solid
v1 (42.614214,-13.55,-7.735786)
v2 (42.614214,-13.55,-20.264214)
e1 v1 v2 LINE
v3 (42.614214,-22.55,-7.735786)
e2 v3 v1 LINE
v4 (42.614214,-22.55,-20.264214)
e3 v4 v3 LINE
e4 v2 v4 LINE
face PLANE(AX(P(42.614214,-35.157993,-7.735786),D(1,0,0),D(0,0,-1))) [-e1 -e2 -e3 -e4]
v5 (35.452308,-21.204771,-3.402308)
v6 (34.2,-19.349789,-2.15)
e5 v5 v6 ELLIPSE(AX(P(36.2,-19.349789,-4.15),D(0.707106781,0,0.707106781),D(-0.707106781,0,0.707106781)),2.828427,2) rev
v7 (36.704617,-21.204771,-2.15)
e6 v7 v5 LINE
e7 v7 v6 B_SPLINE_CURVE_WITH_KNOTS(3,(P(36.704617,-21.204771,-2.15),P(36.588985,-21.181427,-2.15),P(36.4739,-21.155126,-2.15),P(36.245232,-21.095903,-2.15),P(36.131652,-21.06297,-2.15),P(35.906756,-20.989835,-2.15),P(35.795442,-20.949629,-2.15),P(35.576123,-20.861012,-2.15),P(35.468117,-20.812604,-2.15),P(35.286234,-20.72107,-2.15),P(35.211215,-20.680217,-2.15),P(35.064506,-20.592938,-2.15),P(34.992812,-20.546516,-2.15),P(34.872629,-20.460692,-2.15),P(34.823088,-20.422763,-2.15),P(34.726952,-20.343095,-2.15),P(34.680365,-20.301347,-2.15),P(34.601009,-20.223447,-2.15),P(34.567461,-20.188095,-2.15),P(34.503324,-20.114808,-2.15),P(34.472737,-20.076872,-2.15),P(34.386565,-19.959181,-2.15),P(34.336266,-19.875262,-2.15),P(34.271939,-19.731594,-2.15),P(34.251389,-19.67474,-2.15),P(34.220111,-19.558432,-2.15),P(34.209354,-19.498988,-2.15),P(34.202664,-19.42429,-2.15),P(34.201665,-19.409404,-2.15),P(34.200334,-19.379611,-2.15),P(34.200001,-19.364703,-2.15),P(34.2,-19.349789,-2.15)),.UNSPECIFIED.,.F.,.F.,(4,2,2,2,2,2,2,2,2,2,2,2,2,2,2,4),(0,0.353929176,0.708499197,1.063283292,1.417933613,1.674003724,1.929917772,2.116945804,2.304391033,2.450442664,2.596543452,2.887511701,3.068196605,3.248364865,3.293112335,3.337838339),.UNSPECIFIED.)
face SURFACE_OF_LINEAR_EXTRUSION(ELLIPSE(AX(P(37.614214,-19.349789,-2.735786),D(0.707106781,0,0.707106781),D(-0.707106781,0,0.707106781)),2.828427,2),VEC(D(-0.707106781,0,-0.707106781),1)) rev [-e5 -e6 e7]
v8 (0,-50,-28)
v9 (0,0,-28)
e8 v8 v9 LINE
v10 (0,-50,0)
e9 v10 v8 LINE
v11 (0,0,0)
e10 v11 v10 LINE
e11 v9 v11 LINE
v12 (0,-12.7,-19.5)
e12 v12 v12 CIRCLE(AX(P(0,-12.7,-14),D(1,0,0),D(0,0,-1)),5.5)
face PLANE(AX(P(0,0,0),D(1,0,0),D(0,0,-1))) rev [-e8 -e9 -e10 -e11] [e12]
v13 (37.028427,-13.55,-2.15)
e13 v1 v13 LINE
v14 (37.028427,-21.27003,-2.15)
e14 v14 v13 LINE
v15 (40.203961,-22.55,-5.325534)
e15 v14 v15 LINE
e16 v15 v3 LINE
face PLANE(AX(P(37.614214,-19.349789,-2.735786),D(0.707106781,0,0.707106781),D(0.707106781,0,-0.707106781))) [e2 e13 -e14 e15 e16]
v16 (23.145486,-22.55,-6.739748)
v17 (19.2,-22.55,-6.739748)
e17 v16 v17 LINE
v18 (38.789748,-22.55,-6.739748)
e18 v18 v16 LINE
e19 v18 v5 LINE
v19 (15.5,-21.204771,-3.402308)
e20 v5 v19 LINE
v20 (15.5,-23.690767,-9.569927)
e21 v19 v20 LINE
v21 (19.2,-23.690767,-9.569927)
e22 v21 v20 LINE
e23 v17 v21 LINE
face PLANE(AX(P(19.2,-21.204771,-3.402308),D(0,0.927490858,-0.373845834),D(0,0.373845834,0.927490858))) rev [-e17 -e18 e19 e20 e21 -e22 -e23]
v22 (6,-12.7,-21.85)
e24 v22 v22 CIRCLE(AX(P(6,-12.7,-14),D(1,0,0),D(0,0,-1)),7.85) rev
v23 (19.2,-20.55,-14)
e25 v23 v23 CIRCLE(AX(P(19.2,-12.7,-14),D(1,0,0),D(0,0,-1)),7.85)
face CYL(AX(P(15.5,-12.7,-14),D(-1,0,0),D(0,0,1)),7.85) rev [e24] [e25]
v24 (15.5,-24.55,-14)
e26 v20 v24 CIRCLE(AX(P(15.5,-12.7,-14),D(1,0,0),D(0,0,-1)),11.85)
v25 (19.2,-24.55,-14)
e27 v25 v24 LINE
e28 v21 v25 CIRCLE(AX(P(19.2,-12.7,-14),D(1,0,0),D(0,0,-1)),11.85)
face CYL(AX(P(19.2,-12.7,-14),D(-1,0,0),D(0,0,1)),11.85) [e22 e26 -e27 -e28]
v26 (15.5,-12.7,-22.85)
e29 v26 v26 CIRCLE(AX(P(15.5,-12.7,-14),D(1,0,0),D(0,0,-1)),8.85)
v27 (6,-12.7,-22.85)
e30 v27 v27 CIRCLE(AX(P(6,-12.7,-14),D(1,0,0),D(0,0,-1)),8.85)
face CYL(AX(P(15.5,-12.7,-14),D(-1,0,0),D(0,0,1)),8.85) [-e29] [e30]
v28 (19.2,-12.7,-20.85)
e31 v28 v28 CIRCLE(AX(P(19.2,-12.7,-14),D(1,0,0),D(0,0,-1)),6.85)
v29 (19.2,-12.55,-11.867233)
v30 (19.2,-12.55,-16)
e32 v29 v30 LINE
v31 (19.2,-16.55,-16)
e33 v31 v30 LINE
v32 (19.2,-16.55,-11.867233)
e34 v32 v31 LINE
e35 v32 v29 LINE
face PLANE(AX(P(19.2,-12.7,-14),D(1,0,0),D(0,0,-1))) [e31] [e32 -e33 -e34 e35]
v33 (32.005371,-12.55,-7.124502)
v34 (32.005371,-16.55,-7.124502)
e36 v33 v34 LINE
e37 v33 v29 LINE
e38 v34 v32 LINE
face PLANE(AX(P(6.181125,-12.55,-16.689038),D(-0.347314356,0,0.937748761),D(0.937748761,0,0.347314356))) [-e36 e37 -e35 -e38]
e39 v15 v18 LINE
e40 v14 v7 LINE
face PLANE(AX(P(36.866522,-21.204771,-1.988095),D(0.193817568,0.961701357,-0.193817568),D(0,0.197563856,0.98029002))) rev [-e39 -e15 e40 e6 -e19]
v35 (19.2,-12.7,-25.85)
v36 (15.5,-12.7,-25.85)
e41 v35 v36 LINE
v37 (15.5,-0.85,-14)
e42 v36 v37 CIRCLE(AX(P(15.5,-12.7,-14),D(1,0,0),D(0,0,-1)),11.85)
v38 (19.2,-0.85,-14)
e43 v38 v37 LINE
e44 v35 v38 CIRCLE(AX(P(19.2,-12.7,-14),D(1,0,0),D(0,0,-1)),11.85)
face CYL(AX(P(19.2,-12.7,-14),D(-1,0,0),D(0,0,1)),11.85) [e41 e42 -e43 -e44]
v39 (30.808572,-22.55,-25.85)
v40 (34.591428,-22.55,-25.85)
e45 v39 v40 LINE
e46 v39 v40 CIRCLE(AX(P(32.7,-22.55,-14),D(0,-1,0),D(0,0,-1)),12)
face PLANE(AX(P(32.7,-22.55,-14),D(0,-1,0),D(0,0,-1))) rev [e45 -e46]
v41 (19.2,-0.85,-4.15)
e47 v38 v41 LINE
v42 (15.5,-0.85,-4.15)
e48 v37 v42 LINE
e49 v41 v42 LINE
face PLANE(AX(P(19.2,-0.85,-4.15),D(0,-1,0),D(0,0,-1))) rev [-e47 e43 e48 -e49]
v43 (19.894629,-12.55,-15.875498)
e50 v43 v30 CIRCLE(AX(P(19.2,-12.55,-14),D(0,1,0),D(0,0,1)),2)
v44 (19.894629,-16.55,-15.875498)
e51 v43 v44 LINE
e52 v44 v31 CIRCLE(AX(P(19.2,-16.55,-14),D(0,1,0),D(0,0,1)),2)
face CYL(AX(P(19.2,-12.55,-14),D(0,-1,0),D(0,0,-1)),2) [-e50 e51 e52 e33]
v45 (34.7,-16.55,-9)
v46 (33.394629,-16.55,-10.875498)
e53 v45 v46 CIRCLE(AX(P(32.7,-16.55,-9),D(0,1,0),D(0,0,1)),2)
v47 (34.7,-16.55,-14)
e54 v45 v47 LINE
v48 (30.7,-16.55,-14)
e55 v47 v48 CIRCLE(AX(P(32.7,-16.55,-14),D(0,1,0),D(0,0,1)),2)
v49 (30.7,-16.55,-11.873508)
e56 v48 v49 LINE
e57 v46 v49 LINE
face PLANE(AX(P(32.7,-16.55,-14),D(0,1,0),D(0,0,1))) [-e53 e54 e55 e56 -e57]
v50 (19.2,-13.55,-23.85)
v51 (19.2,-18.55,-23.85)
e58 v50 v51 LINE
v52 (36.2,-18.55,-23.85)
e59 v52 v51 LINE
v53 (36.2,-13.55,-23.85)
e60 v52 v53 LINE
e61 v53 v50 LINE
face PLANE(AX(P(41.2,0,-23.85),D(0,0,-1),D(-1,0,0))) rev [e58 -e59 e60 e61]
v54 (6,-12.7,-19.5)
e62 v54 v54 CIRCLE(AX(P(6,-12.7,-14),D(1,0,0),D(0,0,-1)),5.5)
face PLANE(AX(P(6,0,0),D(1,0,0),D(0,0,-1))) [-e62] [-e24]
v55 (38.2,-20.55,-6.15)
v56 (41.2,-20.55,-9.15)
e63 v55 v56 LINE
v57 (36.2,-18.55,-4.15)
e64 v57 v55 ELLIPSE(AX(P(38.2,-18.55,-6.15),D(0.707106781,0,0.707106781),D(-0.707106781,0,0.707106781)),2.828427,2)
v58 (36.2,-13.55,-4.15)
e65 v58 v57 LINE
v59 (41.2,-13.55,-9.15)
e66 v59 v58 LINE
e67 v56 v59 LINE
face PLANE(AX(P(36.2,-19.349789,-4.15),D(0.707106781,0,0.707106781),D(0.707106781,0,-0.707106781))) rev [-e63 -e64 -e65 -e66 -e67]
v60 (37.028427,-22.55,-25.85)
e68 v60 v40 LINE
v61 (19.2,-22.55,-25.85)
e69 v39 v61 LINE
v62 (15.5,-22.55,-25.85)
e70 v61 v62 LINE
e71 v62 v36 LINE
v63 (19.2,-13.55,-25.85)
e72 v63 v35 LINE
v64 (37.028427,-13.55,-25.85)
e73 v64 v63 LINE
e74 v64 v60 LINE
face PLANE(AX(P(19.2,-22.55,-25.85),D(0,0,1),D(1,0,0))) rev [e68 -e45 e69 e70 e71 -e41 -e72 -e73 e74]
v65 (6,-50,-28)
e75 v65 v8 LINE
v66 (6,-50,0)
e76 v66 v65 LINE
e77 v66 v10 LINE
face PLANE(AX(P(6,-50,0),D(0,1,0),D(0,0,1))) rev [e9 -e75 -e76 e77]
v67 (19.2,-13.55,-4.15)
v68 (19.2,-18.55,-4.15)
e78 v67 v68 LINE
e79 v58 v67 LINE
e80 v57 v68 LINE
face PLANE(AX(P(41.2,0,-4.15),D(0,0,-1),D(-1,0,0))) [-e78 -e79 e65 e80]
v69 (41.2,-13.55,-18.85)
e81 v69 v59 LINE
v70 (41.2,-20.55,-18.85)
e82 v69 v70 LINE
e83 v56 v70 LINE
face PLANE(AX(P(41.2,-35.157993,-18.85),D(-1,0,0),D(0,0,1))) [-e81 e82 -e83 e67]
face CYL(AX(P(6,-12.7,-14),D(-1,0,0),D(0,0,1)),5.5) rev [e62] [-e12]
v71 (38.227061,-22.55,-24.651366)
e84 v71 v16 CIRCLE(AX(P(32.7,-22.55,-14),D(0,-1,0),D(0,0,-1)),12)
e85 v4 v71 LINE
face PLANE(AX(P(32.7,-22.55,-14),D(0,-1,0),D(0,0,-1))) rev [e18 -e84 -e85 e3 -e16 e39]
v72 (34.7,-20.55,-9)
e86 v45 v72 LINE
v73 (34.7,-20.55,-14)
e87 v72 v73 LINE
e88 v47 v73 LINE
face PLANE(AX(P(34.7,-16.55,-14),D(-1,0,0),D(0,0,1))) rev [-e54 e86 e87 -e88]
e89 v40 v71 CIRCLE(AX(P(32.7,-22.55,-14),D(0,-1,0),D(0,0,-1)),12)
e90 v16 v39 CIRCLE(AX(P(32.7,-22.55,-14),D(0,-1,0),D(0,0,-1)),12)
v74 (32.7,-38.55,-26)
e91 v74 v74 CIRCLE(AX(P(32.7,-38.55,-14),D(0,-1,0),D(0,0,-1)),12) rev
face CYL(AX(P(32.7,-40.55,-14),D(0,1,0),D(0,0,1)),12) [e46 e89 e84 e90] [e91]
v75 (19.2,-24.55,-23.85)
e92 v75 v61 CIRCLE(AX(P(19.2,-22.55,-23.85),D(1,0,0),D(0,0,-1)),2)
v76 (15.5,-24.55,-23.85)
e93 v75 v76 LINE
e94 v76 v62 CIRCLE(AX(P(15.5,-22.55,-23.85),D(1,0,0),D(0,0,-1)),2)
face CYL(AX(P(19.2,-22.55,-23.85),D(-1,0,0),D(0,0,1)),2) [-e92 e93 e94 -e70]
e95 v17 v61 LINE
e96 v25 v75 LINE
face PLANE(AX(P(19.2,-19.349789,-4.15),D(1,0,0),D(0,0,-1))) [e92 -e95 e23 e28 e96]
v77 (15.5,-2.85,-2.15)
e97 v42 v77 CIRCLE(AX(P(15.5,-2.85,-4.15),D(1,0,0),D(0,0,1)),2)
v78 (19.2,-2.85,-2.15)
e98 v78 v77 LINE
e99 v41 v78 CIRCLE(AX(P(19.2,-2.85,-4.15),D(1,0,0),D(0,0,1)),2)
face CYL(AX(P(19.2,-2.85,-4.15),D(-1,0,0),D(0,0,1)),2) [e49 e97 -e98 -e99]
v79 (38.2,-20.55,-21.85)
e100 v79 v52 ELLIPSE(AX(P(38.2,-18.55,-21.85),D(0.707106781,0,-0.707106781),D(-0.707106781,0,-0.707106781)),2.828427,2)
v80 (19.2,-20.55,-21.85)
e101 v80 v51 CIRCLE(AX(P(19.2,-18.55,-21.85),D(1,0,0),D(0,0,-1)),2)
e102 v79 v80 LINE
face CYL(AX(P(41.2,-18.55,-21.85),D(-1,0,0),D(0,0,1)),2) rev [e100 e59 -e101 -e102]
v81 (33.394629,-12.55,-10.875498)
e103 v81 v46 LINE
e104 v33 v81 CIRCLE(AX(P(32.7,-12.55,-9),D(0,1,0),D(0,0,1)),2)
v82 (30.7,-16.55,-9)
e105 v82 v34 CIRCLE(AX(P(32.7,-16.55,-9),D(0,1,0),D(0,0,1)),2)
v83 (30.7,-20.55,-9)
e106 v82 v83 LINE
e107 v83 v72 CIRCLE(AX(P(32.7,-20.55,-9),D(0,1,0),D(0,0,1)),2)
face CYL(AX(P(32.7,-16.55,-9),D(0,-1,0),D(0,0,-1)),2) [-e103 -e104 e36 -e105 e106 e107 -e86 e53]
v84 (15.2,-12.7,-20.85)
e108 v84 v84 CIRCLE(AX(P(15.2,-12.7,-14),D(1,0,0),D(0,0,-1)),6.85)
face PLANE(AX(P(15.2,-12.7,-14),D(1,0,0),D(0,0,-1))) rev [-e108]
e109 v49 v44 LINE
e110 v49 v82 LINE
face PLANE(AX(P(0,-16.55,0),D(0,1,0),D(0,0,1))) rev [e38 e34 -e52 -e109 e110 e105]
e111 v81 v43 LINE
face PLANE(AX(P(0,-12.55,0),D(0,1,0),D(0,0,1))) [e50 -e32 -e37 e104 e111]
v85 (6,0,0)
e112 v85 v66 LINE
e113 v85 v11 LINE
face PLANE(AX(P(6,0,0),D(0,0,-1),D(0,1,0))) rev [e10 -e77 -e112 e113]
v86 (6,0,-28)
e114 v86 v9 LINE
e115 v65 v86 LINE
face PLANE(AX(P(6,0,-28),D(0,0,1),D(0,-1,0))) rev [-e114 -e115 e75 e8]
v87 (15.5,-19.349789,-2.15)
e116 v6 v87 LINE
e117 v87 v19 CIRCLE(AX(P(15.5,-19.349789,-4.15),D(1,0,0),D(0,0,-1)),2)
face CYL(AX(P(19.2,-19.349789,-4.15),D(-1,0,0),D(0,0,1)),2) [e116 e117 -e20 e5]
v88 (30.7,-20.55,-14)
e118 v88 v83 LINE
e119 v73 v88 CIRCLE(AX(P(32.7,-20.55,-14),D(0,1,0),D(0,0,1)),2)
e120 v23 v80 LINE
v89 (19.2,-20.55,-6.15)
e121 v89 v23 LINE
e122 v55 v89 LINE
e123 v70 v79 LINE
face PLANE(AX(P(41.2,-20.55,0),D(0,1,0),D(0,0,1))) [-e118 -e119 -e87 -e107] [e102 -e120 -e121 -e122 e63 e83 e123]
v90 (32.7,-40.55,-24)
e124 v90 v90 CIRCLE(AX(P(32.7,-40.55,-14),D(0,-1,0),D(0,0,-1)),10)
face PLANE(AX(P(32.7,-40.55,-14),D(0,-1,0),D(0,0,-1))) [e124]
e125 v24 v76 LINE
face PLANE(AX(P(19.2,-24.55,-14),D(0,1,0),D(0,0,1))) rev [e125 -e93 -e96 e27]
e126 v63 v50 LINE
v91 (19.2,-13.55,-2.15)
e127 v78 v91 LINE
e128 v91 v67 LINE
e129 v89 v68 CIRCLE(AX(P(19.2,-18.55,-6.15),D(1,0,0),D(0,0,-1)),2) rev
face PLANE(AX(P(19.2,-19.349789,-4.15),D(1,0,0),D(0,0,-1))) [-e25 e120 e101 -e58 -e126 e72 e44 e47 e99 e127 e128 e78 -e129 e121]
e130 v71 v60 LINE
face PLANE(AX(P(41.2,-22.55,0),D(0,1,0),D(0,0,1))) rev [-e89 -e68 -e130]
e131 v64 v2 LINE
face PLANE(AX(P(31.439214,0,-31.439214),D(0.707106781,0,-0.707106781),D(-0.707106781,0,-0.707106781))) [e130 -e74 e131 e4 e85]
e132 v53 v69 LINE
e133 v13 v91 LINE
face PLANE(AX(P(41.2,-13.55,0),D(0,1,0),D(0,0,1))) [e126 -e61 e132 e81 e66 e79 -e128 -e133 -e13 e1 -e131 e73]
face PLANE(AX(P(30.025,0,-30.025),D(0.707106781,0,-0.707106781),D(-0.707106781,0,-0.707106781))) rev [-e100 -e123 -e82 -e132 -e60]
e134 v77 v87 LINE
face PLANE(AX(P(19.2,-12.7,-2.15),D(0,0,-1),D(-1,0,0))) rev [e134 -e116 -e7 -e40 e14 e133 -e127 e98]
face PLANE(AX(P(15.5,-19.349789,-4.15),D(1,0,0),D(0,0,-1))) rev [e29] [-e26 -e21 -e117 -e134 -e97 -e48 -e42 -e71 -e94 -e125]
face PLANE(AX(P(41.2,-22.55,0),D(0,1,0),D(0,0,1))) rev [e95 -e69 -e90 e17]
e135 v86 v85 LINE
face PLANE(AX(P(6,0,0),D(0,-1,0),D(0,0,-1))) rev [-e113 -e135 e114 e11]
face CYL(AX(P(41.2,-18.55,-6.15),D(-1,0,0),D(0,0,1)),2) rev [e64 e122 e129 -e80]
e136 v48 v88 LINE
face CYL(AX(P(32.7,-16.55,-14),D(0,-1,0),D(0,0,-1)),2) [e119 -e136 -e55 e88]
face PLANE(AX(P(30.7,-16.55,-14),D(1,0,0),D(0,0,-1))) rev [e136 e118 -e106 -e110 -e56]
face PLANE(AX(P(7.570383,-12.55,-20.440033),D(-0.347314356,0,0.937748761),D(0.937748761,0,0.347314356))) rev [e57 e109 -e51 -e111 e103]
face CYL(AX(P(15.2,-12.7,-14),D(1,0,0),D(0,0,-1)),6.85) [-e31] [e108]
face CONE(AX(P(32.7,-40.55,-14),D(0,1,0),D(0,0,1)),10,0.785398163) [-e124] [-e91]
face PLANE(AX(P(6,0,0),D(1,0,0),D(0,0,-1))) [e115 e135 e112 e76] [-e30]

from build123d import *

# Parameters (mm, degrees)
SKETCH1_W               = 28
SKETCH1_H               = 50
SKETCH1_R               = 5.5
BOSS_EXTRUDE1_DEPTH     = 6
SKETCH2_R               = 8.85
SKETCH2_R_2             = 7.85
BOSS_EXTRUDE2_DEPTH     = 9.5
SKETCH3_R               = 7.85
BOSS_EXTRUDE3_DEPTH     = 3.7
BOSS_EXTRUDE4_DEPTH     = 22
CHAMFER1_SIZE           = 7
BOSS_EXTRUDE5_DEPTH     = 2
BOSS_EXTRUDE6_DEPTH     = 2
BOSS_EXTRUDE7_DEPTH     = 9
CUT_EXTRUDE1_DEPTH      = 63.678335221
CUT_EXTRUDE1_DEPTH_BACK = 63.678335221
BOSS_EXTRUDE8_DEPTH     = 4
BOSS_EXTRUDE9_DEPTH     = 4
SKETCH12_R              = 6.85
BOSS_EXTRUDE10_DEPTH    = 4
SKETCH13_R              = 12
BOSS_EXTRUDE11_DEPTH    = 18
CHAMFER2_SIZE           = 2


with BuildPart() as part:
    # Sketch1 → Boss-Extrude1 (new body)
    with BuildSketch(Plane(origin=(0, 0, 0), x_dir=(0, 0, -1), z_dir=(1, 0, 0))):
        with Locations((14, -25)):
            Rectangle(SKETCH1_W, SKETCH1_H)
        with Locations((14, -12.7)):
            Circle(SKETCH1_R, mode=Mode.SUBTRACT)
    extrude(amount=BOSS_EXTRUDE1_DEPTH)

    # Sketch2 → Boss-Extrude2 (add)
    with BuildSketch(Plane(origin=(6, 0, 0), x_dir=(0, 0, -1), z_dir=(1, 0, 0))):
        with Locations((14, -12.7)):
            Circle(SKETCH2_R)
        with Locations((14, -12.7)):
            Circle(SKETCH2_R_2, mode=Mode.SUBTRACT)
    extrude(amount=BOSS_EXTRUDE2_DEPTH)

    # Sketch3 → Boss-Extrude3 (add)
    with BuildSketch(Plane(origin=(15.5, 0, 0), x_dir=(0, 0, -1), z_dir=(1, 0, 0))):
        with BuildLine():
            Line((2.15, -12.7), (2.15, -2.85))
            ThreePointArc((2.15, -2.85), (2.735786438, -1.435786438), (4.15, -0.85))
            Line((4.15, -0.85), (14, -0.85))
            ThreePointArc((14, -0.85), (22.379215357, -4.320784643), (25.85, -12.7))
            Line((25.85, -12.7), (25.85, -22.55))
            ThreePointArc((25.85, -22.55), (25.264213562, -23.964213562), (23.85, -24.55))
            Line((23.85, -24.55), (14, -24.55))
            ThreePointArc((14, -24.55), (11.74368498, -24.333208609), (9.569926867, -23.690766672))
            Line((9.569926867, -23.690766672), (3.402308332, -21.204770746))
            ThreePointArc((3.402308332, -21.204770746), (2.492383739, -20.46885486), (2.15, -19.34978903))
            Line((2.15, -19.34978903), (2.15, -12.7))
        make_face()
        with Locations((14, -12.7)):
            Circle(SKETCH3_R, mode=Mode.SUBTRACT)
    extrude(amount=BOSS_EXTRUDE3_DEPTH)

    # Sketch4 → Boss-Extrude4 (add)
    with BuildSketch(Plane(origin=(19.2, 0, 0), x_dir=(0, 0, -1), z_dir=(1, 0, 0))):
        with BuildLine():
            Line((21.85, -20.55), (6.15, -20.55))
            ThreePointArc((6.15, -20.55), (4.735786438, -19.964213562), (4.15, -18.55))
            Line((4.15, -18.55), (4.15, -13.55))
            Line((4.15, -13.55), (2.15, -13.55))
            Line((2.15, -13.55), (2.15, -19.34978903))
            ThreePointArc((2.15, -19.34978903), (2.252675107, -19.982369656), (2.55015825, -20.55))
            ThreePointArc((2.55015825, -20.55), (2.931431385, -20.935692725), (3.402308332, -21.204770746))
            Line((3.402308332, -21.204770746), (6.739747784, -22.55))
            Line((6.739747784, -22.55), (25.85, -22.55))
            Line((25.85, -22.55), (25.85, -20.55))
            Line((25.85, -20.55), (25.85, -13.55))
            Line((25.85, -13.55), (23.85, -13.55))
            Line((23.85, -13.55), (23.85, -18.55))
            ThreePointArc((23.85, -18.55), (23.264213562, -19.964213562), (21.85, -20.55))
        make_face()
    extrude(amount=BOSS_EXTRUDE4_DEPTH)

    # Chamfer1
    # the kernel refuses this chamfer: 7 mm, written as the material it takes off along each edge
    with BuildSketch(Plane(origin=(41.2, 4.451780916, -25.85), x_dir=(0.027495876610586112, 0, 0.9996219169112968), z_dir=(0, -1, 0))) as chamfer1_piece_1:
        Polygon((CHAMFER1_SIZE * 0.999621916911, CHAMFER1_SIZE * 0.0274958766106), (-CHAMFER1_SIZE * 0.0274958766106, CHAMFER1_SIZE * 0.999621916911), (0, 0), align=None)
    extrude(amount=45.003561832, mode=Mode.SUBTRACT)
    with BuildSketch(Plane(origin=(41.2, 4.451780916, -2.15), x_dir=(0.02749587661058612, 0, -0.9996219169112968), z_dir=(0, -1, 0))) as chamfer1_piece_2:
        Polygon((CHAMFER1_SIZE * 0.999621916911, -CHAMFER1_SIZE * 0.0274958766106), (-CHAMFER1_SIZE * 0.0274958766106, -CHAMFER1_SIZE * 0.999621916911), (0, 0), align=None)
    extrude(amount=41.803350861, mode=Mode.SUBTRACT)

    # Sketch6 → Boss-Extrude5 (add)
    with BuildSketch(Plane(origin=(16.025, 0, 16.025), x_dir=(0.7071067811865438, 0, -0.7071067811865512), z_dir=(0.7071067811865512, 0, 0.7071067811865438))):
        with BuildLine():
            Line((28.531758621, -13.55), (35.602826433, -13.55))
            Line((35.602826433, -13.55), (35.602826433, -20.55))
            Line((35.602826433, -20.55), (35.602826433, -22.55))
            Line((35.602826433, -22.55), (32.19421506, -22.55))
            Line((32.19421506, -22.55), (27.474362924, -21.204770746))
            add(Edge.make_bspline(
                [(25.703331496, -19.34978903), (25.703331496, -20.7), (27.474362924, -21.204770746)],
                knots=[0, 0, 0, 1.187644261, 1.187644261, 1.187644261], degree=2, weights=[1, 0.82880813, 1]))
            Line((25.703331496, -19.34978903), (25.703331496, -13.55))
            Line((25.703331496, -13.55), (28.531758621, -13.55))
        make_face()
    extrude(amount=BOSS_EXTRUDE5_DEPTH)

    # Sketch7 → Boss-Extrude6 (add)
    with BuildSketch(Plane(origin=(30.025, 0, -30.025), x_dir=(-0.7071067811865438, 0, -0.7071067811865512), z_dir=(0.7071067811865512, 0, -0.7071067811865438))):
        Polygon((-15.80383656, -20.55), (-15.80383656, -13.55), (-8.732768748, -13.55), (-5.904341623, -13.55), (-5.904341623, -22.55), (-15.80383656, -22.55), align=None)
    extrude(amount=BOSS_EXTRUDE6_DEPTH)

    # Sketch8 → Boss-Extrude7 (add)
    with BuildSketch(Plane(origin=(0, -13.55, 0), x_dir=(1, 0, 0), z_dir=(0, 1, 0))):
        Polygon((41.2, 18.85), (41.2, 9.15), (42.614213562, 7.735786438), (42.614213562, 20.264213562), align=None)
    extrude(amount=-BOSS_EXTRUDE7_DEPTH)

    # Sketch9 → Cut-Extrude1 (cut, two sides: drawn at the far end of the back side and taken through both)
    with BuildSketch(Plane(origin=(0, -13.55, 0), x_dir=(1, 0, 0), z_dir=(0, 1, 0)).offset(-CUT_EXTRUDE1_DEPTH_BACK)):
        Polygon((34.2, 2.15), (37.028427125, 2.15), (35.614213562, 0.735786438), align=None)
        Polygon((34.2, 25.85), (37.028427125, 25.85), (35.614213562, 27.264213562), align=None)
    extrude(amount=CUT_EXTRUDE1_DEPTH + CUT_EXTRUDE1_DEPTH_BACK, mode=Mode.SUBTRACT)

    # Sketch10 → Boss-Extrude8 (add)
    with BuildSketch(Plane(origin=(0, -20.55, 0), x_dir=(1, 0, 0), z_dir=(0, 1, 0))):
        with BuildLine():
            Line((34.7, 14), (34.7, 9))
            ThreePointArc((34.7, 9), (32.7, 7), (30.7, 9))
            Line((30.7, 9), (30.7, 14))
            ThreePointArc((30.7, 14), (32.7, 16), (34.7, 14))
        make_face()
    extrude(amount=BOSS_EXTRUDE8_DEPTH)

    # Sketch11 → Boss-Extrude9 (add)
    with BuildSketch(Plane(origin=(0, -16.55, 0), x_dir=(1, 0, 0), z_dir=(0, 1, 0))):
        with BuildLine():
            Line((18.505371288, 12.124502479), (32.005371288, 7.124502479))
            ThreePointArc((32.005371288, 7.124502479), (34.575497521, 8.305371288), (33.394628712, 10.875497521))
            Line((33.394628712, 10.875497521), (19.894628712, 15.875497521))
            ThreePointArc((19.894628712, 15.875497521), (17.324502479, 14.694628712), (18.505371288, 12.124502479))
        make_face()
    extrude(amount=BOSS_EXTRUDE9_DEPTH)

    # Sketch12 → Boss-Extrude10 (add)
    with BuildSketch(Plane(origin=(19.2, 0, 0), x_dir=(0, 0, -1), z_dir=(1, 0, 0))):
        with Locations((14, -12.7)):
            Circle(SKETCH12_R)
    extrude(amount=-BOSS_EXTRUDE10_DEPTH)

    # Sketch13 → Boss-Extrude11 (add)
    with BuildSketch(Plane.XZ.offset(22.55)):
        with Locations(Location((32.7, -14, 0), (0, 0, 142.769645669))):
            Circle(SKETCH13_R)
    extrude(amount=BOSS_EXTRUDE11_DEPTH)

    # Chamfer2
    chamfer2_edges = [part.edges().sort_by_distance(p)[0] for p in [
        (42.254513999, -40.55, -21.260252216),
    ]]
    chamfer(chamfer2_edges, length=CHAMFER2_SIZE)


solid = part.part
